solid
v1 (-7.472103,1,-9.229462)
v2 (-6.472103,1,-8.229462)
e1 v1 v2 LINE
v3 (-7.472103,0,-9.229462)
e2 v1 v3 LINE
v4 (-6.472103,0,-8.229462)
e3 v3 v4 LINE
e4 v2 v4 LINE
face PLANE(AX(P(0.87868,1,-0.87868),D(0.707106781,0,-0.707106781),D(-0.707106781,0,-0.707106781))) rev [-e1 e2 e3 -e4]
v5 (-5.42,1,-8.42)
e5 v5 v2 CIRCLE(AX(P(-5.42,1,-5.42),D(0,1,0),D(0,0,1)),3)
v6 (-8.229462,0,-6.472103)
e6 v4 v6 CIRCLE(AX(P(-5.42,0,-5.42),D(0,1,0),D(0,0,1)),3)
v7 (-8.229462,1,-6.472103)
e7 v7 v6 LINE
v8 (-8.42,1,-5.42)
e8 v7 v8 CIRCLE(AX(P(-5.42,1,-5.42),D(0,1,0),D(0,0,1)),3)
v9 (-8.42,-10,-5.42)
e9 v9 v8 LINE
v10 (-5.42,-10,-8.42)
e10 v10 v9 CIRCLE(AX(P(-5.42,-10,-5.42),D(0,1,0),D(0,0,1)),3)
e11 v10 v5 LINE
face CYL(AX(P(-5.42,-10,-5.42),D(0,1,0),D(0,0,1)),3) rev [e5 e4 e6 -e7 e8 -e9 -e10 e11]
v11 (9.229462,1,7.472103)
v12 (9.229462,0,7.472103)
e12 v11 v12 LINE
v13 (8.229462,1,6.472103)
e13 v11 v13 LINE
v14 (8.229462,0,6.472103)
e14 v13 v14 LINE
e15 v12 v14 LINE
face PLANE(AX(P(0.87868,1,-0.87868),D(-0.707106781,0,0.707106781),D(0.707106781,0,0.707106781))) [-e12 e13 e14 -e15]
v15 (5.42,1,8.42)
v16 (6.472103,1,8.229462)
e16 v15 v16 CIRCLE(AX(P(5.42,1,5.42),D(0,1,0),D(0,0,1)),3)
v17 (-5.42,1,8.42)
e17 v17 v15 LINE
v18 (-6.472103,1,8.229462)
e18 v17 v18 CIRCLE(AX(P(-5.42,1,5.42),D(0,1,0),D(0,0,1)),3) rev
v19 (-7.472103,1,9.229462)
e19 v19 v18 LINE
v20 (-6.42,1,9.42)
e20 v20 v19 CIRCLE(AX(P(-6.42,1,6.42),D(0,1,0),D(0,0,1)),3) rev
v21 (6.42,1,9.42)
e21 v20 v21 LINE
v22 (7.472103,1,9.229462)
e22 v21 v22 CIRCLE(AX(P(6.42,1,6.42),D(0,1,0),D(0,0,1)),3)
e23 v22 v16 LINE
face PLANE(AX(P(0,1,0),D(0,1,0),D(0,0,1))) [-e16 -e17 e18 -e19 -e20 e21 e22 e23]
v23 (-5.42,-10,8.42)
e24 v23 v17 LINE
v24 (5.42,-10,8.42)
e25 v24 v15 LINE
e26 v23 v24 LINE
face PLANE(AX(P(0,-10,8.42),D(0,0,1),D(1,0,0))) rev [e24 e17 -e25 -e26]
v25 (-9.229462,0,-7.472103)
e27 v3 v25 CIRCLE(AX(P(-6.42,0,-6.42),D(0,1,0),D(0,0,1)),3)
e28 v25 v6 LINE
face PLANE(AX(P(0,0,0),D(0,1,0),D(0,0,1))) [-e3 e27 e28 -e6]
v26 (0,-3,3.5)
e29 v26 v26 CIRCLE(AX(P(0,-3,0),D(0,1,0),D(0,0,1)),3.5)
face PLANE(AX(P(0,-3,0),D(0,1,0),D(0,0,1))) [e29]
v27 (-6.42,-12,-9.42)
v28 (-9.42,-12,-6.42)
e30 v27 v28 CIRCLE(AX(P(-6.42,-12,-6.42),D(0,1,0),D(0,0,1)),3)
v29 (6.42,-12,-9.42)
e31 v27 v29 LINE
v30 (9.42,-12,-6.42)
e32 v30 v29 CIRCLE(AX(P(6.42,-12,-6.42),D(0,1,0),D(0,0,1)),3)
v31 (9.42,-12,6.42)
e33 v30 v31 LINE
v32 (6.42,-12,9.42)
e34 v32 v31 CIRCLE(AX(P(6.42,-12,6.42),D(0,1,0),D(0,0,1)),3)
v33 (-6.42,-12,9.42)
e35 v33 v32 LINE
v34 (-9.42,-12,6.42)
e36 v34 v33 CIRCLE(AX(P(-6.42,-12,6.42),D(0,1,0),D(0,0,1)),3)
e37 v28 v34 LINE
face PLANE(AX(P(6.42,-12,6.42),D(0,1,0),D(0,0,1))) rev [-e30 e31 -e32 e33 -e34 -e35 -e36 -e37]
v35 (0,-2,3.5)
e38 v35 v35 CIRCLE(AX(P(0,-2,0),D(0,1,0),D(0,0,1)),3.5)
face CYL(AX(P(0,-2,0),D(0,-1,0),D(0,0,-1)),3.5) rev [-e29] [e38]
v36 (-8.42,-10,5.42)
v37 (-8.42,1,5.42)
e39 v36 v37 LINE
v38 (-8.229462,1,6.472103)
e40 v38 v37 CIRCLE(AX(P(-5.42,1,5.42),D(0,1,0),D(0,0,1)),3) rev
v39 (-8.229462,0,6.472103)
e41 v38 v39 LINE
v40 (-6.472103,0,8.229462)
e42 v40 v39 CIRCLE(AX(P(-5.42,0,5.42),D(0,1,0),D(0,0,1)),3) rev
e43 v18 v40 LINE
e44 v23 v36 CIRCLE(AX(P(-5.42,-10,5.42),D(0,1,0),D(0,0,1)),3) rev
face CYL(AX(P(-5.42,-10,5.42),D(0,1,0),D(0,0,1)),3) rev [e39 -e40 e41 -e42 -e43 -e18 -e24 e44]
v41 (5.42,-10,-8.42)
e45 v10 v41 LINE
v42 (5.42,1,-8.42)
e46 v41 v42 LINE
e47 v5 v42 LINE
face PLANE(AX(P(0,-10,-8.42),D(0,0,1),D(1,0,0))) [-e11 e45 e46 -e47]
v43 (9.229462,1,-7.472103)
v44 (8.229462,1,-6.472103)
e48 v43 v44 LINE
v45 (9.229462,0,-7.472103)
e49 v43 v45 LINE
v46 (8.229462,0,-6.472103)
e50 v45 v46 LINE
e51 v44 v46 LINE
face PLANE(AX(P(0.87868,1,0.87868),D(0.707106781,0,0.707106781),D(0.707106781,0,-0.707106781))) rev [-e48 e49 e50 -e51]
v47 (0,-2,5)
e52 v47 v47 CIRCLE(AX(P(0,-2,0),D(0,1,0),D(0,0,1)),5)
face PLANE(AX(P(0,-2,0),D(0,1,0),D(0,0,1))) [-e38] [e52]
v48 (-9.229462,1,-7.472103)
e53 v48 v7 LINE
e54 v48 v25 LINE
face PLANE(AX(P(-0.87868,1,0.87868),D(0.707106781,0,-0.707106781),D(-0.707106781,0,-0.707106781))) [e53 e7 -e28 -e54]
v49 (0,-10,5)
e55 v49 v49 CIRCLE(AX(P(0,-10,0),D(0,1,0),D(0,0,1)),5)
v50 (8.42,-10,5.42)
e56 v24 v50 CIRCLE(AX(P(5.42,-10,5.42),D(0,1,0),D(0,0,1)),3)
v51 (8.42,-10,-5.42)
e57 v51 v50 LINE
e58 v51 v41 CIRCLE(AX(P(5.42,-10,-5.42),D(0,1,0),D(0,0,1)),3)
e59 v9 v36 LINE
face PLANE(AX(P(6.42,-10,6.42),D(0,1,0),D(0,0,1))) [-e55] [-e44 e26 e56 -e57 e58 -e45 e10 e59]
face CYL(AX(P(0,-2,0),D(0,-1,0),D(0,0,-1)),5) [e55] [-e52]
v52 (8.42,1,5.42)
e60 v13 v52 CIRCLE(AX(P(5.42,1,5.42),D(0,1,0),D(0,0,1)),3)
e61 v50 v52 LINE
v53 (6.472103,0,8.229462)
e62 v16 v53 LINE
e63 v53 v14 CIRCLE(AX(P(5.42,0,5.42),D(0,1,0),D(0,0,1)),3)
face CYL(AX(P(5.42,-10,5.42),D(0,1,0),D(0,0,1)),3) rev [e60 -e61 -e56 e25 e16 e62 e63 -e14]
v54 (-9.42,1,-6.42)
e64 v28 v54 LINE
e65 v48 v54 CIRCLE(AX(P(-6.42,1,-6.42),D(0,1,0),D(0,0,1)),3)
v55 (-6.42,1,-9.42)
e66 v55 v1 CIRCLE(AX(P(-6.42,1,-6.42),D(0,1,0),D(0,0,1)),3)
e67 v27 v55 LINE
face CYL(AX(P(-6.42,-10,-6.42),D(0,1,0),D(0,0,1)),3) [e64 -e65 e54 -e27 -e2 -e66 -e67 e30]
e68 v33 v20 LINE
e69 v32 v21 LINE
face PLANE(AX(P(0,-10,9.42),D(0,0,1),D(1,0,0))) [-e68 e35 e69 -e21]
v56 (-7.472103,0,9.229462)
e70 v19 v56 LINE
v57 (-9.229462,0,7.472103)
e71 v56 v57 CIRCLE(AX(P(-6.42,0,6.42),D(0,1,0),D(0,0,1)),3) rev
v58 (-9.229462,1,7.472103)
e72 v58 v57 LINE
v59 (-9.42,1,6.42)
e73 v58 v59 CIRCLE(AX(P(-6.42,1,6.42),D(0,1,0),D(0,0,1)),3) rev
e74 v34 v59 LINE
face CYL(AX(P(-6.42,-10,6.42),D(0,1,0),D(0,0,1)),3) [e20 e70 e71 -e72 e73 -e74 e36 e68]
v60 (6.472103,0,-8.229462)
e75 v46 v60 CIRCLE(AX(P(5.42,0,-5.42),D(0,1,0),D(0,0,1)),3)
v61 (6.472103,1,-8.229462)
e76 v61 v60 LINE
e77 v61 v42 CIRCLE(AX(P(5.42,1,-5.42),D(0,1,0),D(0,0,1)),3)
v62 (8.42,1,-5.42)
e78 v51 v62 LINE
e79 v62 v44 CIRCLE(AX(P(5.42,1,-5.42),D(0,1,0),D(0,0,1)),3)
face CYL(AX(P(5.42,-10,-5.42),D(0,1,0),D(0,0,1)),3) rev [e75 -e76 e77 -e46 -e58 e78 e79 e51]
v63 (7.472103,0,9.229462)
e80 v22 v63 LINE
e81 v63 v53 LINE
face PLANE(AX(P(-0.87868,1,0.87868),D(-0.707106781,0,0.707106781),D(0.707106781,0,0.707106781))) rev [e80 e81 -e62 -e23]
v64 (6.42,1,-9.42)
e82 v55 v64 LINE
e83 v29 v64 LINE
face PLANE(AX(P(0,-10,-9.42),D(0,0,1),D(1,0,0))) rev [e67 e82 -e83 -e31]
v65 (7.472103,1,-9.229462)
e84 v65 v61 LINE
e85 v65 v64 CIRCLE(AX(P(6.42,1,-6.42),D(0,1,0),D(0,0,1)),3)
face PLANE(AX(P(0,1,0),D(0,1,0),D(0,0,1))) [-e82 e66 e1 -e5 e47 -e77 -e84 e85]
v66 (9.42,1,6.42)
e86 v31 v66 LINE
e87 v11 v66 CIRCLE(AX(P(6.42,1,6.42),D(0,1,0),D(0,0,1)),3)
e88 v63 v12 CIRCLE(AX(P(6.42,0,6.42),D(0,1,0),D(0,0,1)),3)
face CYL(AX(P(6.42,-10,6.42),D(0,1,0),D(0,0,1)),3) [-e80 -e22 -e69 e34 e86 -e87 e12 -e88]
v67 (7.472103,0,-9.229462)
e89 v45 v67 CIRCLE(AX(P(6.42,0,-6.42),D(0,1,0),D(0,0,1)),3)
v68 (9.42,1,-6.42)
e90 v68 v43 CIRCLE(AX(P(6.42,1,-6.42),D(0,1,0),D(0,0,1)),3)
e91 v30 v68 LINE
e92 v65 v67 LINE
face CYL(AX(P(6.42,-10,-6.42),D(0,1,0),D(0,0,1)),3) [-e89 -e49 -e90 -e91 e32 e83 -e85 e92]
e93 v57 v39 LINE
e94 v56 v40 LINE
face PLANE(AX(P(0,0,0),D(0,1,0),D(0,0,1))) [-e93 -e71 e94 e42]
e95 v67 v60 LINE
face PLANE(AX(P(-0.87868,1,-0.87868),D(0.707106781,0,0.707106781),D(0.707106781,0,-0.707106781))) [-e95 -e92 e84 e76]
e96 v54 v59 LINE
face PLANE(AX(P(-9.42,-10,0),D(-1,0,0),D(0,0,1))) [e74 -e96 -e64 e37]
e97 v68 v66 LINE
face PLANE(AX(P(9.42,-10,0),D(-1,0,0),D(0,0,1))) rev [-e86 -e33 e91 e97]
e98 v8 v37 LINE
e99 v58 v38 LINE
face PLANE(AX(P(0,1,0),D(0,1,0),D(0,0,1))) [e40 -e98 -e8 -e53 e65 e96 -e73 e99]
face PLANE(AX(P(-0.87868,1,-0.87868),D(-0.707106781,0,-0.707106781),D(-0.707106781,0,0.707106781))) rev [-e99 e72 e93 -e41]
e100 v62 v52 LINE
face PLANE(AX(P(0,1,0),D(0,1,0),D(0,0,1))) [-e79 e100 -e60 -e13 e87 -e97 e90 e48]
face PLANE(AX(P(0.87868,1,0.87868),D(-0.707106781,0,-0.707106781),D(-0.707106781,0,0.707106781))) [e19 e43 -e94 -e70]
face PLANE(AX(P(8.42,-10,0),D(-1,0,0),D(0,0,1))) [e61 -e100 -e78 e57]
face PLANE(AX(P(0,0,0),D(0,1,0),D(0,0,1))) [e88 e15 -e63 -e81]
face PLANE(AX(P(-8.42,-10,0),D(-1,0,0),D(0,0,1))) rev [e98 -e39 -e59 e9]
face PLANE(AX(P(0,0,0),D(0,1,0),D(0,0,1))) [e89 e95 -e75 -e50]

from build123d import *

# Parameters (mm, degrees)
EXTRUDE_3_DEPTH = 10
EXTRUDE_START   = -12
EXTRUDE_4_DEPTH = 2
EXTRUDE_START_2 = 1
EXTRUDE_5_DEPTH = 1
SKETCH_2_R      = 5
SKETCH_2_R_2    = 3.5
EXTRUDE_6_DEPTH = 8
SKETCH_2_2_R    = 3.5
EXTRUDE_7_DEPTH = 7


# Read off the part's stored shape, not the designer's step: 凸台-拉伸4
with BuildPart() as part:
    # 草图1 → 凸台-拉伸3 (new body)
    with BuildSketch(Plane(origin=(0, 0, 0), x_dir=(1, 0, 0), z_dir=(0, 1, 0))):
        with BuildLine():
            Line((-8.229462415, 6.472103102), (-9.229462415, 7.472103102))
            ThreePointArc((-9.229462415, 7.472103102), (-9.371981305, 6.954608621), (-9.42, 6.42))
            Line((-9.42, 6.42), (-9.42, -6.42))
            ThreePointArc((-9.42, -6.42), (-9.371981305, -6.954608621), (-9.229462415, -7.472103102))
            Line((-9.229462415, -7.472103102), (-8.229462415, -6.472103102))
            ThreePointArc((-8.229462415, -6.472103102), (-8.371981305, -5.954608621), (-8.42, -5.42))
            Line((-8.42, -5.42), (-8.42, 5.42))
            ThreePointArc((-8.42, 5.42), (-8.371981305, 5.954608621), (-8.229462415, 6.472103102))
        make_face()
        with BuildLine():
            Line((-6.472103102, 8.229462415), (-7.472103102, 9.229462415))
            ThreePointArc((-7.472103102, 9.229462415), (-8.541320344, 8.541320344), (-9.229462415, 7.472103102))
            Line((-9.229462415, 7.472103102), (-8.229462415, 6.472103102))
            ThreePointArc((-8.229462415, 6.472103102), (-7.541320344, 7.541320344), (-6.472103102, 8.229462415))
        make_face()
        with BuildLine():
            ThreePointArc((7.472103102, 9.229462415), (6.954608621, 9.371981305), (6.42, 9.42))
            Line((6.42, 9.42), (-6.42, 9.42))
            ThreePointArc((-6.42, 9.42), (-6.954608621, 9.371981305), (-7.472103102, 9.229462415))
            Line((-7.472103102, 9.229462415), (-6.472103102, 8.229462415))
            ThreePointArc((-6.472103102, 8.229462415), (-5.954608621, 8.371981305), (-5.42, 8.42))
            Line((-5.42, 8.42), (5.42, 8.42))
            ThreePointArc((5.42, 8.42), (5.954608621, 8.371981305), (6.472103102, 8.229462415))
            Line((6.472103102, 8.229462415), (7.472103102, 9.229462415))
        make_face()
        with BuildLine():
            Line((-8.229462415, -6.472103102), (-9.229462415, -7.472103102))
            ThreePointArc((-9.229462415, -7.472103102), (-8.541320344, -8.541320344), (-7.472103102, -9.229462415))
            Line((-7.472103102, -9.229462415), (-6.472103102, -8.229462415))
            ThreePointArc((-6.472103102, -8.229462415), (-7.541320344, -7.541320344), (-8.229462415, -6.472103102))
        make_face()
        with BuildLine():
            ThreePointArc((6.42, -9.42), (6.954608621, -9.371981305), (7.472103102, -9.229462415))
            Line((7.472103102, -9.229462415), (6.472103102, -8.229462415))
            ThreePointArc((6.472103102, -8.229462415), (5.954608621, -8.371981305), (5.42, -8.42))
            Line((5.42, -8.42), (-5.42, -8.42))
            ThreePointArc((-5.42, -8.42), (-5.954608621, -8.371981305), (-6.472103102, -8.229462415))
            Line((-6.472103102, -8.229462415), (-7.472103102, -9.229462415))
            ThreePointArc((-7.472103102, -9.229462415), (-6.954608621, -9.371981305), (-6.42, -9.42))
            Line((-6.42, -9.42), (6.42, -9.42))
        make_face()
        with BuildLine():
            ThreePointArc((7.472103102, -9.229462415), (8.541320344, -8.541320344), (9.229462415, -7.472103102))
            Line((9.229462415, -7.472103102), (8.229462415, -6.472103102))
            ThreePointArc((8.229462415, -6.472103102), (7.541320344, -7.541320344), (6.472103102, -8.229462415))
            Line((6.472103102, -8.229462415), (7.472103102, -9.229462415))
        make_face()
        with BuildLine():
            ThreePointArc((9.42, 6.42), (9.371981305, 6.954608621), (9.229462415, 7.472103102))
            Line((9.229462415, 7.472103102), (8.229462415, 6.472103102))
            ThreePointArc((8.229462415, 6.472103102), (8.371981305, 5.954608621), (8.42, 5.42))
            Line((8.42, 5.42), (8.42, -5.42))
            ThreePointArc((8.42, -5.42), (8.371981305, -5.954608621), (8.229462415, -6.472103102))
            Line((8.229462415, -6.472103102), (9.229462415, -7.472103102))
            ThreePointArc((9.229462415, -7.472103102), (9.371981305, -6.954608621), (9.42, -6.42))
            Line((9.42, -6.42), (9.42, 6.42))
        make_face()
        with BuildLine():
            ThreePointArc((9.229462415, 7.472103102), (8.541320344, 8.541320344), (7.472103102, 9.229462415))
            Line((7.472103102, 9.229462415), (6.472103102, 8.229462415))
            ThreePointArc((6.472103102, 8.229462415), (7.541320344, 7.541320344), (8.229462415, 6.472103102))
            Line((8.229462415, 6.472103102), (9.229462415, 7.472103102))
        make_face()
    extrude(amount=-EXTRUDE_3_DEPTH)

    # 凸台-拉伸4 outline → 凸台-拉伸4 (add)
    with BuildSketch(Plane(origin=(0, 0, 0), x_dir=(1, 0, 0), z_dir=(0, 1, 0)).offset(EXTRUDE_START)):
        with BuildLine():
            Line((-9.42, 6.42), (-9.42, -6.42))
            ThreePointArc((-9.42, -6.42), (-8.541320344, -8.541320344), (-6.42, -9.42))
            Line((-6.42, -9.42), (6.42, -9.42))
            ThreePointArc((6.42, -9.42), (8.541320344, -8.541320344), (9.42, -6.42))
            Line((9.42, -6.42), (9.42, 6.42))
            ThreePointArc((9.42, 6.42), (8.541320344, 8.541320344), (6.42, 9.42))
            Line((6.42, 9.42), (-6.42, 9.42))
            ThreePointArc((-6.42, 9.42), (-8.541320344, 8.541320344), (-9.42, 6.42))
        make_face()
    extrude(amount=EXTRUDE_4_DEPTH)

    # 草图1<7> → 凸台-拉伸5 (add)
    with BuildSketch(Plane(origin=(0, 0, 0), x_dir=(1, 0, 0), z_dir=(0, 1, 0)).offset(EXTRUDE_START_2)):
        with BuildLine():
            Line((-8.229462415, 6.472103102), (-9.229462415, 7.472103102))
            ThreePointArc((-9.229462415, 7.472103102), (-9.371981305, 6.954608621), (-9.42, 6.42))
            Line((-9.42, 6.42), (-9.42, -6.42))
            ThreePointArc((-9.42, -6.42), (-9.371981305, -6.954608621), (-9.229462415, -7.472103102))
            Line((-9.229462415, -7.472103102), (-8.229462415, -6.472103102))
            ThreePointArc((-8.229462415, -6.472103102), (-8.371981305, -5.954608621), (-8.42, -5.42))
            Line((-8.42, -5.42), (-8.42, 5.42))
            ThreePointArc((-8.42, 5.42), (-8.371981305, 5.954608621), (-8.229462415, 6.472103102))
        make_face()
        with BuildLine():
            ThreePointArc((7.472103102, 9.229462415), (6.954608621, 9.371981305), (6.42, 9.42))
            Line((6.42, 9.42), (-6.42, 9.42))
            ThreePointArc((-6.42, 9.42), (-6.954608621, 9.371981305), (-7.472103102, 9.229462415))
            Line((-7.472103102, 9.229462415), (-6.472103102, 8.229462415))
            ThreePointArc((-6.472103102, 8.229462415), (-5.954608621, 8.371981305), (-5.42, 8.42))
            Line((-5.42, 8.42), (5.42, 8.42))
            ThreePointArc((5.42, 8.42), (5.954608621, 8.371981305), (6.472103102, 8.229462415))
            Line((6.472103102, 8.229462415), (7.472103102, 9.229462415))
        make_face()
        with BuildLine():
            ThreePointArc((9.42, 6.42), (9.371981305, 6.954608621), (9.229462415, 7.472103102))
            Line((9.229462415, 7.472103102), (8.229462415, 6.472103102))
            ThreePointArc((8.229462415, 6.472103102), (8.371981305, 5.954608621), (8.42, 5.42))
            Line((8.42, 5.42), (8.42, -5.42))
            ThreePointArc((8.42, -5.42), (8.371981305, -5.954608621), (8.229462415, -6.472103102))
            Line((8.229462415, -6.472103102), (9.229462415, -7.472103102))
            ThreePointArc((9.229462415, -7.472103102), (9.371981305, -6.954608621), (9.42, -6.42))
            Line((9.42, -6.42), (9.42, 6.42))
        make_face()
        with BuildLine():
            ThreePointArc((6.42, -9.42), (6.954608621, -9.371981305), (7.472103102, -9.229462415))
            Line((7.472103102, -9.229462415), (6.472103102, -8.229462415))
            ThreePointArc((6.472103102, -8.229462415), (5.954608621, -8.371981305), (5.42, -8.42))
            Line((5.42, -8.42), (-5.42, -8.42))
            ThreePointArc((-5.42, -8.42), (-5.954608621, -8.371981305), (-6.472103102, -8.229462415))
            Line((-6.472103102, -8.229462415), (-7.472103102, -9.229462415))
            ThreePointArc((-7.472103102, -9.229462415), (-6.954608621, -9.371981305), (-6.42, -9.42))
            Line((-6.42, -9.42), (6.42, -9.42))
        make_face()
    extrude(amount=-EXTRUDE_5_DEPTH)

    # 草图2 → 凸台-拉伸6 (add)
    with BuildSketch(Plane(origin=(0, -10, 0), x_dir=(1, 0, 0), z_dir=(0, 1, 0))):
        with Locations(Location((0, 0, 0), (0, 0, 270))):
            Circle(SKETCH_2_R)
        with Locations(Location((0, 0, 0), (0, 0, 270))):
            Circle(SKETCH_2_R_2, mode=Mode.SUBTRACT)
    extrude(amount=EXTRUDE_6_DEPTH)

    # 草图2<2> → 凸台-拉伸7 (add)
    with BuildSketch(Plane(origin=(0, -10, 0), x_dir=(1, 0, 0), z_dir=(0, 1, 0))):
        with Locations(Location((0, 0, 0), (0, 0, 270))):
            Circle(SKETCH_2_2_R)
    extrude(amount=EXTRUDE_7_DEPTH)


solid = part.part
